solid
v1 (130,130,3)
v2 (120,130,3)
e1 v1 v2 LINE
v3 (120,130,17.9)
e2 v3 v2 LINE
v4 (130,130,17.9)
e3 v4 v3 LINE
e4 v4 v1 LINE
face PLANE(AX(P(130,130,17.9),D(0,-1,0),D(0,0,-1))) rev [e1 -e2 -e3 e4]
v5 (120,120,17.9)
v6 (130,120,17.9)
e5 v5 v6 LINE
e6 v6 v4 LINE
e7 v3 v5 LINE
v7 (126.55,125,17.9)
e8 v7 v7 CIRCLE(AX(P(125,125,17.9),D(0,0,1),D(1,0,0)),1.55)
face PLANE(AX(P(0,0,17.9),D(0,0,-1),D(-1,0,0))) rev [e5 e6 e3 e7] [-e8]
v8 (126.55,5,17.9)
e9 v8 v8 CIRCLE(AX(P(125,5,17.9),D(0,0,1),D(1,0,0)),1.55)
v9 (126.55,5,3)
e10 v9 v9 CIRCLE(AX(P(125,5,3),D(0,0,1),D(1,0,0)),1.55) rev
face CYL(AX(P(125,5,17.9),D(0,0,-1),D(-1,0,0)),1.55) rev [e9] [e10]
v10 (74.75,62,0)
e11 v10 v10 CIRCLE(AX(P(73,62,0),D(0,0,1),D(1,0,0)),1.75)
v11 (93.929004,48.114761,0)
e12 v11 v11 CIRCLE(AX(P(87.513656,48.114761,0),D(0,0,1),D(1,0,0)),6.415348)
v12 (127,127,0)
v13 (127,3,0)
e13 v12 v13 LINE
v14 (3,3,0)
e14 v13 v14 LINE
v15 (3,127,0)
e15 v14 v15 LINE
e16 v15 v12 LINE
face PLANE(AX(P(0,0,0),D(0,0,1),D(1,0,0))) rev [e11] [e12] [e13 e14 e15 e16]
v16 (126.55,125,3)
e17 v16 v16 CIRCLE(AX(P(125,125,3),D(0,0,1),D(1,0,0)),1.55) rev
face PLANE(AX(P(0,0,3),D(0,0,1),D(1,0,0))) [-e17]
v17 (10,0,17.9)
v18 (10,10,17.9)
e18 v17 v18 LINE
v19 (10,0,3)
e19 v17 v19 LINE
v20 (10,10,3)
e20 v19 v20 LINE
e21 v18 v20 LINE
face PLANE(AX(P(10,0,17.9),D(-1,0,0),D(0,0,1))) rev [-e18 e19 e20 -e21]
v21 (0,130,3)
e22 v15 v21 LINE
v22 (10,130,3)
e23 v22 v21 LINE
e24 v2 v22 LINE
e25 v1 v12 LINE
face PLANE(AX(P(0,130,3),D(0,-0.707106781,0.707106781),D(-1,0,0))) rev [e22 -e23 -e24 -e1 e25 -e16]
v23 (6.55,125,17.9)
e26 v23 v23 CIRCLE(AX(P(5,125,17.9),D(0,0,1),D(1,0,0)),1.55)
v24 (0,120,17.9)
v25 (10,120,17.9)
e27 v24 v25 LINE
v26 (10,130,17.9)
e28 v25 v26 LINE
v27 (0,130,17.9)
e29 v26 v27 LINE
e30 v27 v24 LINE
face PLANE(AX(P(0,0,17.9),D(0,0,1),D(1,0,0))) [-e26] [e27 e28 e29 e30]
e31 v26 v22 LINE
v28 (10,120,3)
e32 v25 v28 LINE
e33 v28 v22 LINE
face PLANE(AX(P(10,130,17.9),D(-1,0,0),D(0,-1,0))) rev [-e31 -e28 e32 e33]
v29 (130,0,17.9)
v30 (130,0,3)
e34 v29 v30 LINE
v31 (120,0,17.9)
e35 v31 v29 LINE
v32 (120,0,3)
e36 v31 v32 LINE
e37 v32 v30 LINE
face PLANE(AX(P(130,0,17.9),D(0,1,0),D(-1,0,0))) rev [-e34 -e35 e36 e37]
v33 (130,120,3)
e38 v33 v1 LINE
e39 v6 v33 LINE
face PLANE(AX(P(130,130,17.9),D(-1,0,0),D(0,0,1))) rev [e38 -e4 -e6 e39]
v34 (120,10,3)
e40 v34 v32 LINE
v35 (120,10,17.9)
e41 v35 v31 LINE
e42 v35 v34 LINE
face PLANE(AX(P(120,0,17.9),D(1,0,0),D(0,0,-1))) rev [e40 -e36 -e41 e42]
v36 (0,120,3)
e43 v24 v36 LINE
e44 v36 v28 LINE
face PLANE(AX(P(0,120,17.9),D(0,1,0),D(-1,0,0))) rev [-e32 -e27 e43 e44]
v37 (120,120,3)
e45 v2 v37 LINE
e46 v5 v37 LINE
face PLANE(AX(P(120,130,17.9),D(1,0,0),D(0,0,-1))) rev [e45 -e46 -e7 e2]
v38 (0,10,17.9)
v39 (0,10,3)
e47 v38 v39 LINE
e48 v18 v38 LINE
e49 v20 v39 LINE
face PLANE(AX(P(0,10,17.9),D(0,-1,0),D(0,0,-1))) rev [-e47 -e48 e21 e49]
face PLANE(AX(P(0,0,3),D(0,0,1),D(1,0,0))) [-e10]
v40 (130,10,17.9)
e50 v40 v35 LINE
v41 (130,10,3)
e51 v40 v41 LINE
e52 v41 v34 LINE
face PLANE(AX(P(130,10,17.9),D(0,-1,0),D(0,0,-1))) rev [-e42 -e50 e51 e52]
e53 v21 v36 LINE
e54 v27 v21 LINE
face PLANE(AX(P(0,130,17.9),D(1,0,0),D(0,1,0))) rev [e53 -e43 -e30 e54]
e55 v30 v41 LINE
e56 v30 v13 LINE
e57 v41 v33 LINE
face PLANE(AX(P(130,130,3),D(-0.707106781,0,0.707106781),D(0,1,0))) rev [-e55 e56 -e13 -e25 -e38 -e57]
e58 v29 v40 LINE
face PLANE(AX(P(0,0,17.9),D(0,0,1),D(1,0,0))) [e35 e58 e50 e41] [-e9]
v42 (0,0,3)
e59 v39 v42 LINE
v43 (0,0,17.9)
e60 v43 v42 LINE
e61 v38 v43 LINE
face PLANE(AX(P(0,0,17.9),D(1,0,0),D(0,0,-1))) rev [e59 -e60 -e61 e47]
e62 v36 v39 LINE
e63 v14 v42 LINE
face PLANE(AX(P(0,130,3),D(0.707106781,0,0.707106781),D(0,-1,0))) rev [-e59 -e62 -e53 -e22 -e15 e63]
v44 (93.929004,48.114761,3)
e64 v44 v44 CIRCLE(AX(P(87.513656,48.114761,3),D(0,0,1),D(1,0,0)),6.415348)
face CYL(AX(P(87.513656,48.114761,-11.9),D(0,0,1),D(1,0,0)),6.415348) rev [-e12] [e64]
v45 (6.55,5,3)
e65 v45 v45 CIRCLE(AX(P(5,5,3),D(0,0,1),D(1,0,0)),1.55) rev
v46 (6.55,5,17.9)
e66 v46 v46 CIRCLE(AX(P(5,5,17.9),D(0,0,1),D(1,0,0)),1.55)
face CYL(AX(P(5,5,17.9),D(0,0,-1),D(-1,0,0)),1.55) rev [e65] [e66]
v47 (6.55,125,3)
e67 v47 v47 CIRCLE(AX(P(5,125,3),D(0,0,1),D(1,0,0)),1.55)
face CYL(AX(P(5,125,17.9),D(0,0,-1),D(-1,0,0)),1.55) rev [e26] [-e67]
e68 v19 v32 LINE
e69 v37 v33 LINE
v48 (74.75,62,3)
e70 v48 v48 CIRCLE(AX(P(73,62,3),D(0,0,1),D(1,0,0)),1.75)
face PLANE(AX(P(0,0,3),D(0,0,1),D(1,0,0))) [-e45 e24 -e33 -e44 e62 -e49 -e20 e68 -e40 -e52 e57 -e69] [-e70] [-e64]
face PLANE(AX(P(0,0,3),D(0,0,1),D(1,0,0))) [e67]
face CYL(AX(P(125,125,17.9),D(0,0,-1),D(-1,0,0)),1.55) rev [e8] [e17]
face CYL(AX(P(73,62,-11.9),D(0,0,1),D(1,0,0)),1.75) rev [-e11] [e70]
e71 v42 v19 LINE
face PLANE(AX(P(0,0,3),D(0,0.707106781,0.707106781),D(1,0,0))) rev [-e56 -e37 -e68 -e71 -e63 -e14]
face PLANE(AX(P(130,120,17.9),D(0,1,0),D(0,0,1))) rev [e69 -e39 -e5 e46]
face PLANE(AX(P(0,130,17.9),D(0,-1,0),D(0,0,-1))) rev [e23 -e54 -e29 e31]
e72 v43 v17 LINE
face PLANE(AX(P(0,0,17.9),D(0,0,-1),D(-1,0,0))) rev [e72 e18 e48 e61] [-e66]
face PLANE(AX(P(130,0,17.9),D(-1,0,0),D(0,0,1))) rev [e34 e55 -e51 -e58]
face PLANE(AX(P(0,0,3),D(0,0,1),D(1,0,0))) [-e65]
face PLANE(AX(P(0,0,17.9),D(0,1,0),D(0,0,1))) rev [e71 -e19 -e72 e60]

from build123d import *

# Parameters (mm, degrees)
ESQUISSE1_W             = 130
ESQUISSE1_H             = 130
BOSS_EXTRU_1_DEPTH      = 3
CHANFREIN1_SIZE         = 3
ESQUISSE2_W             = 10
ESQUISSE2_H             = 10
ESQUISSE2_R             = 1.55
BOSS_EXTRU_2_DEPTH      = 14.9
ESQUISSE3_R             = 6.415348162
ESQUISSE3_R_2           = 1.75
ENL_V_MAT_EXTRU_1_DEPTH = 14.9


with BuildPart() as part:
    # Esquisse1 → Boss.-Extru.1 (new body)
    with BuildSketch(Plane.XY):
        with Locations((65, 65)):
            Rectangle(ESQUISSE1_W, ESQUISSE1_H)
    extrude(amount=BOSS_EXTRU_1_DEPTH)

    # Chanfrein1
    chanfrein1_edges = [part.edges().sort_by_distance(p)[0] for p in [
        (65, 130, 0),
        (130, 65, 0),
        (65, 0, 0),
        (0, 65, 0),
    ]]
    chamfer(chanfrein1_edges, length=CHANFREIN1_SIZE - 0.0001)  # a hair under: the kernel refuses the full size

    # Esquisse2 → Boss.-Extru.2 (add)
    # profile 1 of 4: a face of its own
    with BuildSketch(Plane.XY.offset(3)):
        with Locations((5, 125)):
            Rectangle(ESQUISSE2_W, ESQUISSE2_H)
        with Locations((5, 125)):
            Circle(ESQUISSE2_R, mode=Mode.SUBTRACT)
    # profile 2 of 4: a face of its own
    with BuildSketch(Plane.XY.offset(3)):
        with Locations((125, 125)):
            Rectangle(ESQUISSE2_W, ESQUISSE2_H)
        with Locations((125, 125)):
            Circle(ESQUISSE2_R, mode=Mode.SUBTRACT)
    # profile 3 of 4: a face of its own
    with BuildSketch(Plane.XY.offset(3)):
        with Locations((125, 5)):
            Rectangle(ESQUISSE2_W, ESQUISSE2_H)
        with Locations((125, 5)):
            Circle(ESQUISSE2_R, mode=Mode.SUBTRACT)
    # profile 4 of 4: a face of its own
    with BuildSketch(Plane.XY.offset(3)):
        with Locations((5, 5)):
            Rectangle(ESQUISSE2_W, ESQUISSE2_H)
        with Locations((5, 5)):
            Circle(ESQUISSE2_R, mode=Mode.SUBTRACT)
    extrude(amount=BOSS_EXTRU_2_DEPTH)

    # Esquisse3 → Enlèv. mat.-Extru.1 (cut)
    with BuildSketch(Plane.XY.offset(3)):
        with Locations((87.513655995, 48.114761129)):
            Circle(ESQUISSE3_R)
        with Locations((73, 62)):
            Circle(ESQUISSE3_R_2)
    extrude(amount=-ENL_V_MAT_EXTRU_1_DEPTH, mode=Mode.SUBTRACT)


solid = part.part
